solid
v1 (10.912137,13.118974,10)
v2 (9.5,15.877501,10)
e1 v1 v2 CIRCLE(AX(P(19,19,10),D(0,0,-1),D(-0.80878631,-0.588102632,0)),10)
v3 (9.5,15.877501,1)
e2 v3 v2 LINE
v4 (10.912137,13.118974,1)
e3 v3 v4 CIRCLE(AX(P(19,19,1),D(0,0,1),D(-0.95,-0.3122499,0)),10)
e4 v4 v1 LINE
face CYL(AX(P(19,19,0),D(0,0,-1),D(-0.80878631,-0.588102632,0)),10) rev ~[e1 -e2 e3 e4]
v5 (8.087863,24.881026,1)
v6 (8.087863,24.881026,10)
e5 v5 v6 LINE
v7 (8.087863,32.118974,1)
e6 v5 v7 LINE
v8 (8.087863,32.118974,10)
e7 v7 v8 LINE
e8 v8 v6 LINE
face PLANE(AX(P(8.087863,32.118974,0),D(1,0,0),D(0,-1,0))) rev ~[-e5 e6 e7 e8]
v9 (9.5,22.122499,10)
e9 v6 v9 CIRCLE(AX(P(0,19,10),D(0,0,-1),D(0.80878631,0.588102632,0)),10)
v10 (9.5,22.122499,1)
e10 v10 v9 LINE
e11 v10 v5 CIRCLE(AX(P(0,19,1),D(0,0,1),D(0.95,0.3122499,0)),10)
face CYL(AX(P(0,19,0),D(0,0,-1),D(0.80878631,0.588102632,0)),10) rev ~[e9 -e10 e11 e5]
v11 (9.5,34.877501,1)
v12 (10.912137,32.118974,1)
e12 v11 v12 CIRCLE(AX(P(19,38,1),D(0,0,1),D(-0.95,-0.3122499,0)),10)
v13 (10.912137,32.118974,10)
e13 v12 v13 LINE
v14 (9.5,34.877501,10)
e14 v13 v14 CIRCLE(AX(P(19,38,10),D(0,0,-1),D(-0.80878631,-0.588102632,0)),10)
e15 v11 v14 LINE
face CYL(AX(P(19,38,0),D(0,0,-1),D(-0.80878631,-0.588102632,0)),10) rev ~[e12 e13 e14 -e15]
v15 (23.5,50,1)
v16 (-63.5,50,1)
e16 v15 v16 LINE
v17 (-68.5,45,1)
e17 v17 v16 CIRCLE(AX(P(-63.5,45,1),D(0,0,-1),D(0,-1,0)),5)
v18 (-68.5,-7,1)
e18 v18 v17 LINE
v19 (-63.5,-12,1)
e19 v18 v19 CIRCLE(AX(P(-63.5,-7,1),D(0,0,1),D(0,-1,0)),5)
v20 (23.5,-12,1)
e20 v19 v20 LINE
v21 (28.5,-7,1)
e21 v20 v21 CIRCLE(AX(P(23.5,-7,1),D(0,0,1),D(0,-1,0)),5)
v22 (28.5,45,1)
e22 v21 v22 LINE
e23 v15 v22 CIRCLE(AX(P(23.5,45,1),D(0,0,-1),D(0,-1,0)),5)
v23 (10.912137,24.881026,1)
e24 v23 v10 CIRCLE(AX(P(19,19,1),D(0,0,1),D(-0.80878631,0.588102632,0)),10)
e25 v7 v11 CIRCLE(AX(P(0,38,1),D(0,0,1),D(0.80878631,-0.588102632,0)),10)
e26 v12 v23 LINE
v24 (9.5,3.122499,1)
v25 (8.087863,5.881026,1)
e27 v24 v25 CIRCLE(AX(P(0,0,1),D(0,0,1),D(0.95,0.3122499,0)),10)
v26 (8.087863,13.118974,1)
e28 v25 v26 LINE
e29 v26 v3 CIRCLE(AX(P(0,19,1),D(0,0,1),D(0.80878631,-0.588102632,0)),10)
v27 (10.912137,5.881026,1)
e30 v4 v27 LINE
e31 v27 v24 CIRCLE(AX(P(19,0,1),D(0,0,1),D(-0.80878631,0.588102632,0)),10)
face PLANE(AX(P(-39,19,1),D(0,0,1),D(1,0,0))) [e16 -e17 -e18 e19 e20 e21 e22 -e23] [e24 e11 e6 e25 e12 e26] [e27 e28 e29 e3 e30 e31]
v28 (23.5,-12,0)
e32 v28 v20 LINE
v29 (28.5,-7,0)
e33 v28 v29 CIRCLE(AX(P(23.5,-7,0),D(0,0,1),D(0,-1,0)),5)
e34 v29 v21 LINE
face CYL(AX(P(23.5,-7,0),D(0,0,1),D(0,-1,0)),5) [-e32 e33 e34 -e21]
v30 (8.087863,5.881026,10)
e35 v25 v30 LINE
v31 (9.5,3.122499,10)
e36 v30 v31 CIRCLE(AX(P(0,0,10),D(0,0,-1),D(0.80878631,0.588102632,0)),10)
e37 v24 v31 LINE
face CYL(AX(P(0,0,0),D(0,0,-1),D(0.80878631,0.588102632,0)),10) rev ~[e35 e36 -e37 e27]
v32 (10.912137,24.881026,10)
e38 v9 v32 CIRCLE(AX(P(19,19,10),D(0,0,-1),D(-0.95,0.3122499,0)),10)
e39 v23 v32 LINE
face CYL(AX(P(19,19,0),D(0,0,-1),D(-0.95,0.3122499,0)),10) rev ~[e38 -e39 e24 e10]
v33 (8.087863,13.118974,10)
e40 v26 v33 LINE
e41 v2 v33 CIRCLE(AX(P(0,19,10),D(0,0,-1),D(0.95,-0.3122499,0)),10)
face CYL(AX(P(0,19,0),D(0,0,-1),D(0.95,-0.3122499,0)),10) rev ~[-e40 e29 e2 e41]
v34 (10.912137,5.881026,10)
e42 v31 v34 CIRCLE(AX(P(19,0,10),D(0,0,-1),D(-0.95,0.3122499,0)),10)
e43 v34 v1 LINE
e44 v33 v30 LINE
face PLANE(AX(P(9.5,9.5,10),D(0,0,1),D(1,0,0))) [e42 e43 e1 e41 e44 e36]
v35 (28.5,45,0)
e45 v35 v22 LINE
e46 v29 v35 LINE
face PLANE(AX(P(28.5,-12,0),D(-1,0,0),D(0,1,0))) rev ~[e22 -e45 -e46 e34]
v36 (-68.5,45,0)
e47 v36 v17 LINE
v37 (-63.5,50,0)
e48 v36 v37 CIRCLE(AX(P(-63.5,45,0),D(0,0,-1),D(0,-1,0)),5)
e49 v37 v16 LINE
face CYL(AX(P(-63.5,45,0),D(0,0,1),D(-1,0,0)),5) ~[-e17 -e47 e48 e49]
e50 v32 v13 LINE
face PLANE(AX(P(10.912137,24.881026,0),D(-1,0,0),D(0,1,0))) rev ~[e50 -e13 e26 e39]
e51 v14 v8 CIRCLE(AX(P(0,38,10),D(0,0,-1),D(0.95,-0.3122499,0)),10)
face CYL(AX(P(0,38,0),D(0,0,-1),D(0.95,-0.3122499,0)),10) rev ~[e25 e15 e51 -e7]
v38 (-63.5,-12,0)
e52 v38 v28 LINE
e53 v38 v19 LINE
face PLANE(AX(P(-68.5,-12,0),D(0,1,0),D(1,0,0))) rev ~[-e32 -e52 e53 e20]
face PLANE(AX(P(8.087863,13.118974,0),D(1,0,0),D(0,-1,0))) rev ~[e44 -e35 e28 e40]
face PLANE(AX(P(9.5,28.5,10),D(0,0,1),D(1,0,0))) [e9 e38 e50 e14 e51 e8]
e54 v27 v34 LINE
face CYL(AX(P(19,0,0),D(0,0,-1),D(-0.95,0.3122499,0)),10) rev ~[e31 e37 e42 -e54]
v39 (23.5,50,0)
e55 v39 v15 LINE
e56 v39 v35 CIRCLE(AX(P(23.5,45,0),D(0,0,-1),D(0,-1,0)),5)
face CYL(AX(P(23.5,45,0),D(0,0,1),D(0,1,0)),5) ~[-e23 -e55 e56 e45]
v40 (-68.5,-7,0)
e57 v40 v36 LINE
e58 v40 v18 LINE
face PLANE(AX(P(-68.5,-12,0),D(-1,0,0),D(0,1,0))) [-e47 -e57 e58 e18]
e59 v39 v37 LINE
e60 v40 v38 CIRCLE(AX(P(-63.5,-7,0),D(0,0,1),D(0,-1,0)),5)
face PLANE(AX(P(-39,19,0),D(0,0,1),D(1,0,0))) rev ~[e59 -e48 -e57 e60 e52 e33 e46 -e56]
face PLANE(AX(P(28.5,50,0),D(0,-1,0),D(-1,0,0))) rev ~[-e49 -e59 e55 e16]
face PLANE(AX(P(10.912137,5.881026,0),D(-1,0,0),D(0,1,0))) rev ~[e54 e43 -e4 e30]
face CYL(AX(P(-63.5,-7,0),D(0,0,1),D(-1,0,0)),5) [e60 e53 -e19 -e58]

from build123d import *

# Parameters (mm, degrees)
F0_W     = 59
F0_H     = 62
F0_W_2   = 38
F1_DEPTH = 1
F2_DEPTH = 10
F3_R     = 5


# Not quite as in the source:
# - a feature names something its author has since deleted; it is built from what else it names


with BuildPart() as f1:
    # F0 (on Top) → F1 (new body)
    with BuildSketch(Plane.XY):
        with Locations((-39, 19)):
            Rectangle(F0_W, F0_H)
        with Locations((9.5, 19)):
            Rectangle(F0_W_2, F0_H)
        with BuildLine():
            ThreePointArc((9.5, 15.8775010008), (10.0985618966, 14.4432029131), (10.9121369044, 13.1189736826))
            Line((10.9121369044, 13.1189736826), (10.9121369044, 5.8810263174))
            ThreePointArc((10.9121369044, 5.8810263174), (10.0985618966, 4.5567970869), (9.5, 3.1224989992))
            ThreePointArc((9.5, 3.1224989992), (8.9014381034, 4.5567970869), (8.0878630956, 5.8810263174))
            Line((8.0878630956, 5.8810263174), (8.0878630956, 13.1189736826))
            ThreePointArc((8.0878630956, 13.1189736826), (8.9014381034, 14.4432029131), (9.5, 15.8775010008))
        make_face(mode=Mode.SUBTRACT)
        with BuildLine():
            Line((8.0878630956, 24.8810263174), (8.0878630956, 32.1189736826))
            ThreePointArc((8.0878630956, 32.1189736826), (8.9014381034, 33.4432029131), (9.5, 34.8775010008))
            ThreePointArc((9.5, 34.8775010008), (10.0985618966, 33.4432029131), (10.9121369044, 32.1189736826))
            Line((10.9121369044, 32.1189736826), (10.9121369044, 24.8810263174))
            ThreePointArc((10.9121369044, 24.8810263174), (10.0985618966, 23.5567970869), (9.5, 22.1224989992))
            ThreePointArc((9.5, 22.1224989992), (8.9014381034, 23.5567970869), (8.0878630956, 24.8810263174))
        make_face(mode=Mode.SUBTRACT)
    extrude(amount=F1_DEPTH)

    # F0 (on Top) → F2 (join)
    with BuildSketch(Plane.XY):
        with BuildLine():
            ThreePointArc((9.5, 34.8775010008), (8.9014381034, 33.4432029131), (8.0878630956, 32.1189736826))
            Line((8.0878630956, 32.1189736826), (8.0878630956, 24.8810263174))
            ThreePointArc((8.0878630956, 24.8810263174), (8.9014381034, 23.5567970869), (9.5, 22.1224989992))
            ThreePointArc((9.5, 22.1224989992), (10.0985618966, 23.5567970869), (10.9121369044, 24.8810263174))
            Line((10.9121369044, 24.8810263174), (10.9121369044, 32.1189736826))
            ThreePointArc((10.9121369044, 32.1189736826), (10.0985618966, 33.4432029131), (9.5, 34.8775010008))
        make_face()
        with BuildLine():
            Line((10.9121369044, 5.8810263174), (10.9121369044, 13.1189736826))
            ThreePointArc((10.9121369044, 13.1189736826), (10.0985618966, 14.4432029131), (9.5, 15.8775010008))
            ThreePointArc((9.5, 15.8775010008), (8.9014381034, 14.4432029131), (8.0878630956, 13.1189736826))
            Line((8.0878630956, 13.1189736826), (8.0878630956, 5.8810263174))
            ThreePointArc((8.0878630956, 5.8810263174), (8.9014381034, 4.5567970869), (9.5, 3.1224989992))
            ThreePointArc((9.5, 3.1224989992), (10.0985618966, 4.5567970869), (10.9121369044, 5.8810263174))
        make_face()
    extrude(amount=F2_DEPTH)

    # F3
    f3_edges = [f1.edges().sort_by_distance(p)[0] for p in [
        (-68.5, 50, 0.5),
        (28.5, 50, 0.5),
        (28.5, -12, 0.5),
        (-68.5, -12, 0.5),
    ]]
    fillet(f3_edges, radius=F3_R)


solid = f1.part
